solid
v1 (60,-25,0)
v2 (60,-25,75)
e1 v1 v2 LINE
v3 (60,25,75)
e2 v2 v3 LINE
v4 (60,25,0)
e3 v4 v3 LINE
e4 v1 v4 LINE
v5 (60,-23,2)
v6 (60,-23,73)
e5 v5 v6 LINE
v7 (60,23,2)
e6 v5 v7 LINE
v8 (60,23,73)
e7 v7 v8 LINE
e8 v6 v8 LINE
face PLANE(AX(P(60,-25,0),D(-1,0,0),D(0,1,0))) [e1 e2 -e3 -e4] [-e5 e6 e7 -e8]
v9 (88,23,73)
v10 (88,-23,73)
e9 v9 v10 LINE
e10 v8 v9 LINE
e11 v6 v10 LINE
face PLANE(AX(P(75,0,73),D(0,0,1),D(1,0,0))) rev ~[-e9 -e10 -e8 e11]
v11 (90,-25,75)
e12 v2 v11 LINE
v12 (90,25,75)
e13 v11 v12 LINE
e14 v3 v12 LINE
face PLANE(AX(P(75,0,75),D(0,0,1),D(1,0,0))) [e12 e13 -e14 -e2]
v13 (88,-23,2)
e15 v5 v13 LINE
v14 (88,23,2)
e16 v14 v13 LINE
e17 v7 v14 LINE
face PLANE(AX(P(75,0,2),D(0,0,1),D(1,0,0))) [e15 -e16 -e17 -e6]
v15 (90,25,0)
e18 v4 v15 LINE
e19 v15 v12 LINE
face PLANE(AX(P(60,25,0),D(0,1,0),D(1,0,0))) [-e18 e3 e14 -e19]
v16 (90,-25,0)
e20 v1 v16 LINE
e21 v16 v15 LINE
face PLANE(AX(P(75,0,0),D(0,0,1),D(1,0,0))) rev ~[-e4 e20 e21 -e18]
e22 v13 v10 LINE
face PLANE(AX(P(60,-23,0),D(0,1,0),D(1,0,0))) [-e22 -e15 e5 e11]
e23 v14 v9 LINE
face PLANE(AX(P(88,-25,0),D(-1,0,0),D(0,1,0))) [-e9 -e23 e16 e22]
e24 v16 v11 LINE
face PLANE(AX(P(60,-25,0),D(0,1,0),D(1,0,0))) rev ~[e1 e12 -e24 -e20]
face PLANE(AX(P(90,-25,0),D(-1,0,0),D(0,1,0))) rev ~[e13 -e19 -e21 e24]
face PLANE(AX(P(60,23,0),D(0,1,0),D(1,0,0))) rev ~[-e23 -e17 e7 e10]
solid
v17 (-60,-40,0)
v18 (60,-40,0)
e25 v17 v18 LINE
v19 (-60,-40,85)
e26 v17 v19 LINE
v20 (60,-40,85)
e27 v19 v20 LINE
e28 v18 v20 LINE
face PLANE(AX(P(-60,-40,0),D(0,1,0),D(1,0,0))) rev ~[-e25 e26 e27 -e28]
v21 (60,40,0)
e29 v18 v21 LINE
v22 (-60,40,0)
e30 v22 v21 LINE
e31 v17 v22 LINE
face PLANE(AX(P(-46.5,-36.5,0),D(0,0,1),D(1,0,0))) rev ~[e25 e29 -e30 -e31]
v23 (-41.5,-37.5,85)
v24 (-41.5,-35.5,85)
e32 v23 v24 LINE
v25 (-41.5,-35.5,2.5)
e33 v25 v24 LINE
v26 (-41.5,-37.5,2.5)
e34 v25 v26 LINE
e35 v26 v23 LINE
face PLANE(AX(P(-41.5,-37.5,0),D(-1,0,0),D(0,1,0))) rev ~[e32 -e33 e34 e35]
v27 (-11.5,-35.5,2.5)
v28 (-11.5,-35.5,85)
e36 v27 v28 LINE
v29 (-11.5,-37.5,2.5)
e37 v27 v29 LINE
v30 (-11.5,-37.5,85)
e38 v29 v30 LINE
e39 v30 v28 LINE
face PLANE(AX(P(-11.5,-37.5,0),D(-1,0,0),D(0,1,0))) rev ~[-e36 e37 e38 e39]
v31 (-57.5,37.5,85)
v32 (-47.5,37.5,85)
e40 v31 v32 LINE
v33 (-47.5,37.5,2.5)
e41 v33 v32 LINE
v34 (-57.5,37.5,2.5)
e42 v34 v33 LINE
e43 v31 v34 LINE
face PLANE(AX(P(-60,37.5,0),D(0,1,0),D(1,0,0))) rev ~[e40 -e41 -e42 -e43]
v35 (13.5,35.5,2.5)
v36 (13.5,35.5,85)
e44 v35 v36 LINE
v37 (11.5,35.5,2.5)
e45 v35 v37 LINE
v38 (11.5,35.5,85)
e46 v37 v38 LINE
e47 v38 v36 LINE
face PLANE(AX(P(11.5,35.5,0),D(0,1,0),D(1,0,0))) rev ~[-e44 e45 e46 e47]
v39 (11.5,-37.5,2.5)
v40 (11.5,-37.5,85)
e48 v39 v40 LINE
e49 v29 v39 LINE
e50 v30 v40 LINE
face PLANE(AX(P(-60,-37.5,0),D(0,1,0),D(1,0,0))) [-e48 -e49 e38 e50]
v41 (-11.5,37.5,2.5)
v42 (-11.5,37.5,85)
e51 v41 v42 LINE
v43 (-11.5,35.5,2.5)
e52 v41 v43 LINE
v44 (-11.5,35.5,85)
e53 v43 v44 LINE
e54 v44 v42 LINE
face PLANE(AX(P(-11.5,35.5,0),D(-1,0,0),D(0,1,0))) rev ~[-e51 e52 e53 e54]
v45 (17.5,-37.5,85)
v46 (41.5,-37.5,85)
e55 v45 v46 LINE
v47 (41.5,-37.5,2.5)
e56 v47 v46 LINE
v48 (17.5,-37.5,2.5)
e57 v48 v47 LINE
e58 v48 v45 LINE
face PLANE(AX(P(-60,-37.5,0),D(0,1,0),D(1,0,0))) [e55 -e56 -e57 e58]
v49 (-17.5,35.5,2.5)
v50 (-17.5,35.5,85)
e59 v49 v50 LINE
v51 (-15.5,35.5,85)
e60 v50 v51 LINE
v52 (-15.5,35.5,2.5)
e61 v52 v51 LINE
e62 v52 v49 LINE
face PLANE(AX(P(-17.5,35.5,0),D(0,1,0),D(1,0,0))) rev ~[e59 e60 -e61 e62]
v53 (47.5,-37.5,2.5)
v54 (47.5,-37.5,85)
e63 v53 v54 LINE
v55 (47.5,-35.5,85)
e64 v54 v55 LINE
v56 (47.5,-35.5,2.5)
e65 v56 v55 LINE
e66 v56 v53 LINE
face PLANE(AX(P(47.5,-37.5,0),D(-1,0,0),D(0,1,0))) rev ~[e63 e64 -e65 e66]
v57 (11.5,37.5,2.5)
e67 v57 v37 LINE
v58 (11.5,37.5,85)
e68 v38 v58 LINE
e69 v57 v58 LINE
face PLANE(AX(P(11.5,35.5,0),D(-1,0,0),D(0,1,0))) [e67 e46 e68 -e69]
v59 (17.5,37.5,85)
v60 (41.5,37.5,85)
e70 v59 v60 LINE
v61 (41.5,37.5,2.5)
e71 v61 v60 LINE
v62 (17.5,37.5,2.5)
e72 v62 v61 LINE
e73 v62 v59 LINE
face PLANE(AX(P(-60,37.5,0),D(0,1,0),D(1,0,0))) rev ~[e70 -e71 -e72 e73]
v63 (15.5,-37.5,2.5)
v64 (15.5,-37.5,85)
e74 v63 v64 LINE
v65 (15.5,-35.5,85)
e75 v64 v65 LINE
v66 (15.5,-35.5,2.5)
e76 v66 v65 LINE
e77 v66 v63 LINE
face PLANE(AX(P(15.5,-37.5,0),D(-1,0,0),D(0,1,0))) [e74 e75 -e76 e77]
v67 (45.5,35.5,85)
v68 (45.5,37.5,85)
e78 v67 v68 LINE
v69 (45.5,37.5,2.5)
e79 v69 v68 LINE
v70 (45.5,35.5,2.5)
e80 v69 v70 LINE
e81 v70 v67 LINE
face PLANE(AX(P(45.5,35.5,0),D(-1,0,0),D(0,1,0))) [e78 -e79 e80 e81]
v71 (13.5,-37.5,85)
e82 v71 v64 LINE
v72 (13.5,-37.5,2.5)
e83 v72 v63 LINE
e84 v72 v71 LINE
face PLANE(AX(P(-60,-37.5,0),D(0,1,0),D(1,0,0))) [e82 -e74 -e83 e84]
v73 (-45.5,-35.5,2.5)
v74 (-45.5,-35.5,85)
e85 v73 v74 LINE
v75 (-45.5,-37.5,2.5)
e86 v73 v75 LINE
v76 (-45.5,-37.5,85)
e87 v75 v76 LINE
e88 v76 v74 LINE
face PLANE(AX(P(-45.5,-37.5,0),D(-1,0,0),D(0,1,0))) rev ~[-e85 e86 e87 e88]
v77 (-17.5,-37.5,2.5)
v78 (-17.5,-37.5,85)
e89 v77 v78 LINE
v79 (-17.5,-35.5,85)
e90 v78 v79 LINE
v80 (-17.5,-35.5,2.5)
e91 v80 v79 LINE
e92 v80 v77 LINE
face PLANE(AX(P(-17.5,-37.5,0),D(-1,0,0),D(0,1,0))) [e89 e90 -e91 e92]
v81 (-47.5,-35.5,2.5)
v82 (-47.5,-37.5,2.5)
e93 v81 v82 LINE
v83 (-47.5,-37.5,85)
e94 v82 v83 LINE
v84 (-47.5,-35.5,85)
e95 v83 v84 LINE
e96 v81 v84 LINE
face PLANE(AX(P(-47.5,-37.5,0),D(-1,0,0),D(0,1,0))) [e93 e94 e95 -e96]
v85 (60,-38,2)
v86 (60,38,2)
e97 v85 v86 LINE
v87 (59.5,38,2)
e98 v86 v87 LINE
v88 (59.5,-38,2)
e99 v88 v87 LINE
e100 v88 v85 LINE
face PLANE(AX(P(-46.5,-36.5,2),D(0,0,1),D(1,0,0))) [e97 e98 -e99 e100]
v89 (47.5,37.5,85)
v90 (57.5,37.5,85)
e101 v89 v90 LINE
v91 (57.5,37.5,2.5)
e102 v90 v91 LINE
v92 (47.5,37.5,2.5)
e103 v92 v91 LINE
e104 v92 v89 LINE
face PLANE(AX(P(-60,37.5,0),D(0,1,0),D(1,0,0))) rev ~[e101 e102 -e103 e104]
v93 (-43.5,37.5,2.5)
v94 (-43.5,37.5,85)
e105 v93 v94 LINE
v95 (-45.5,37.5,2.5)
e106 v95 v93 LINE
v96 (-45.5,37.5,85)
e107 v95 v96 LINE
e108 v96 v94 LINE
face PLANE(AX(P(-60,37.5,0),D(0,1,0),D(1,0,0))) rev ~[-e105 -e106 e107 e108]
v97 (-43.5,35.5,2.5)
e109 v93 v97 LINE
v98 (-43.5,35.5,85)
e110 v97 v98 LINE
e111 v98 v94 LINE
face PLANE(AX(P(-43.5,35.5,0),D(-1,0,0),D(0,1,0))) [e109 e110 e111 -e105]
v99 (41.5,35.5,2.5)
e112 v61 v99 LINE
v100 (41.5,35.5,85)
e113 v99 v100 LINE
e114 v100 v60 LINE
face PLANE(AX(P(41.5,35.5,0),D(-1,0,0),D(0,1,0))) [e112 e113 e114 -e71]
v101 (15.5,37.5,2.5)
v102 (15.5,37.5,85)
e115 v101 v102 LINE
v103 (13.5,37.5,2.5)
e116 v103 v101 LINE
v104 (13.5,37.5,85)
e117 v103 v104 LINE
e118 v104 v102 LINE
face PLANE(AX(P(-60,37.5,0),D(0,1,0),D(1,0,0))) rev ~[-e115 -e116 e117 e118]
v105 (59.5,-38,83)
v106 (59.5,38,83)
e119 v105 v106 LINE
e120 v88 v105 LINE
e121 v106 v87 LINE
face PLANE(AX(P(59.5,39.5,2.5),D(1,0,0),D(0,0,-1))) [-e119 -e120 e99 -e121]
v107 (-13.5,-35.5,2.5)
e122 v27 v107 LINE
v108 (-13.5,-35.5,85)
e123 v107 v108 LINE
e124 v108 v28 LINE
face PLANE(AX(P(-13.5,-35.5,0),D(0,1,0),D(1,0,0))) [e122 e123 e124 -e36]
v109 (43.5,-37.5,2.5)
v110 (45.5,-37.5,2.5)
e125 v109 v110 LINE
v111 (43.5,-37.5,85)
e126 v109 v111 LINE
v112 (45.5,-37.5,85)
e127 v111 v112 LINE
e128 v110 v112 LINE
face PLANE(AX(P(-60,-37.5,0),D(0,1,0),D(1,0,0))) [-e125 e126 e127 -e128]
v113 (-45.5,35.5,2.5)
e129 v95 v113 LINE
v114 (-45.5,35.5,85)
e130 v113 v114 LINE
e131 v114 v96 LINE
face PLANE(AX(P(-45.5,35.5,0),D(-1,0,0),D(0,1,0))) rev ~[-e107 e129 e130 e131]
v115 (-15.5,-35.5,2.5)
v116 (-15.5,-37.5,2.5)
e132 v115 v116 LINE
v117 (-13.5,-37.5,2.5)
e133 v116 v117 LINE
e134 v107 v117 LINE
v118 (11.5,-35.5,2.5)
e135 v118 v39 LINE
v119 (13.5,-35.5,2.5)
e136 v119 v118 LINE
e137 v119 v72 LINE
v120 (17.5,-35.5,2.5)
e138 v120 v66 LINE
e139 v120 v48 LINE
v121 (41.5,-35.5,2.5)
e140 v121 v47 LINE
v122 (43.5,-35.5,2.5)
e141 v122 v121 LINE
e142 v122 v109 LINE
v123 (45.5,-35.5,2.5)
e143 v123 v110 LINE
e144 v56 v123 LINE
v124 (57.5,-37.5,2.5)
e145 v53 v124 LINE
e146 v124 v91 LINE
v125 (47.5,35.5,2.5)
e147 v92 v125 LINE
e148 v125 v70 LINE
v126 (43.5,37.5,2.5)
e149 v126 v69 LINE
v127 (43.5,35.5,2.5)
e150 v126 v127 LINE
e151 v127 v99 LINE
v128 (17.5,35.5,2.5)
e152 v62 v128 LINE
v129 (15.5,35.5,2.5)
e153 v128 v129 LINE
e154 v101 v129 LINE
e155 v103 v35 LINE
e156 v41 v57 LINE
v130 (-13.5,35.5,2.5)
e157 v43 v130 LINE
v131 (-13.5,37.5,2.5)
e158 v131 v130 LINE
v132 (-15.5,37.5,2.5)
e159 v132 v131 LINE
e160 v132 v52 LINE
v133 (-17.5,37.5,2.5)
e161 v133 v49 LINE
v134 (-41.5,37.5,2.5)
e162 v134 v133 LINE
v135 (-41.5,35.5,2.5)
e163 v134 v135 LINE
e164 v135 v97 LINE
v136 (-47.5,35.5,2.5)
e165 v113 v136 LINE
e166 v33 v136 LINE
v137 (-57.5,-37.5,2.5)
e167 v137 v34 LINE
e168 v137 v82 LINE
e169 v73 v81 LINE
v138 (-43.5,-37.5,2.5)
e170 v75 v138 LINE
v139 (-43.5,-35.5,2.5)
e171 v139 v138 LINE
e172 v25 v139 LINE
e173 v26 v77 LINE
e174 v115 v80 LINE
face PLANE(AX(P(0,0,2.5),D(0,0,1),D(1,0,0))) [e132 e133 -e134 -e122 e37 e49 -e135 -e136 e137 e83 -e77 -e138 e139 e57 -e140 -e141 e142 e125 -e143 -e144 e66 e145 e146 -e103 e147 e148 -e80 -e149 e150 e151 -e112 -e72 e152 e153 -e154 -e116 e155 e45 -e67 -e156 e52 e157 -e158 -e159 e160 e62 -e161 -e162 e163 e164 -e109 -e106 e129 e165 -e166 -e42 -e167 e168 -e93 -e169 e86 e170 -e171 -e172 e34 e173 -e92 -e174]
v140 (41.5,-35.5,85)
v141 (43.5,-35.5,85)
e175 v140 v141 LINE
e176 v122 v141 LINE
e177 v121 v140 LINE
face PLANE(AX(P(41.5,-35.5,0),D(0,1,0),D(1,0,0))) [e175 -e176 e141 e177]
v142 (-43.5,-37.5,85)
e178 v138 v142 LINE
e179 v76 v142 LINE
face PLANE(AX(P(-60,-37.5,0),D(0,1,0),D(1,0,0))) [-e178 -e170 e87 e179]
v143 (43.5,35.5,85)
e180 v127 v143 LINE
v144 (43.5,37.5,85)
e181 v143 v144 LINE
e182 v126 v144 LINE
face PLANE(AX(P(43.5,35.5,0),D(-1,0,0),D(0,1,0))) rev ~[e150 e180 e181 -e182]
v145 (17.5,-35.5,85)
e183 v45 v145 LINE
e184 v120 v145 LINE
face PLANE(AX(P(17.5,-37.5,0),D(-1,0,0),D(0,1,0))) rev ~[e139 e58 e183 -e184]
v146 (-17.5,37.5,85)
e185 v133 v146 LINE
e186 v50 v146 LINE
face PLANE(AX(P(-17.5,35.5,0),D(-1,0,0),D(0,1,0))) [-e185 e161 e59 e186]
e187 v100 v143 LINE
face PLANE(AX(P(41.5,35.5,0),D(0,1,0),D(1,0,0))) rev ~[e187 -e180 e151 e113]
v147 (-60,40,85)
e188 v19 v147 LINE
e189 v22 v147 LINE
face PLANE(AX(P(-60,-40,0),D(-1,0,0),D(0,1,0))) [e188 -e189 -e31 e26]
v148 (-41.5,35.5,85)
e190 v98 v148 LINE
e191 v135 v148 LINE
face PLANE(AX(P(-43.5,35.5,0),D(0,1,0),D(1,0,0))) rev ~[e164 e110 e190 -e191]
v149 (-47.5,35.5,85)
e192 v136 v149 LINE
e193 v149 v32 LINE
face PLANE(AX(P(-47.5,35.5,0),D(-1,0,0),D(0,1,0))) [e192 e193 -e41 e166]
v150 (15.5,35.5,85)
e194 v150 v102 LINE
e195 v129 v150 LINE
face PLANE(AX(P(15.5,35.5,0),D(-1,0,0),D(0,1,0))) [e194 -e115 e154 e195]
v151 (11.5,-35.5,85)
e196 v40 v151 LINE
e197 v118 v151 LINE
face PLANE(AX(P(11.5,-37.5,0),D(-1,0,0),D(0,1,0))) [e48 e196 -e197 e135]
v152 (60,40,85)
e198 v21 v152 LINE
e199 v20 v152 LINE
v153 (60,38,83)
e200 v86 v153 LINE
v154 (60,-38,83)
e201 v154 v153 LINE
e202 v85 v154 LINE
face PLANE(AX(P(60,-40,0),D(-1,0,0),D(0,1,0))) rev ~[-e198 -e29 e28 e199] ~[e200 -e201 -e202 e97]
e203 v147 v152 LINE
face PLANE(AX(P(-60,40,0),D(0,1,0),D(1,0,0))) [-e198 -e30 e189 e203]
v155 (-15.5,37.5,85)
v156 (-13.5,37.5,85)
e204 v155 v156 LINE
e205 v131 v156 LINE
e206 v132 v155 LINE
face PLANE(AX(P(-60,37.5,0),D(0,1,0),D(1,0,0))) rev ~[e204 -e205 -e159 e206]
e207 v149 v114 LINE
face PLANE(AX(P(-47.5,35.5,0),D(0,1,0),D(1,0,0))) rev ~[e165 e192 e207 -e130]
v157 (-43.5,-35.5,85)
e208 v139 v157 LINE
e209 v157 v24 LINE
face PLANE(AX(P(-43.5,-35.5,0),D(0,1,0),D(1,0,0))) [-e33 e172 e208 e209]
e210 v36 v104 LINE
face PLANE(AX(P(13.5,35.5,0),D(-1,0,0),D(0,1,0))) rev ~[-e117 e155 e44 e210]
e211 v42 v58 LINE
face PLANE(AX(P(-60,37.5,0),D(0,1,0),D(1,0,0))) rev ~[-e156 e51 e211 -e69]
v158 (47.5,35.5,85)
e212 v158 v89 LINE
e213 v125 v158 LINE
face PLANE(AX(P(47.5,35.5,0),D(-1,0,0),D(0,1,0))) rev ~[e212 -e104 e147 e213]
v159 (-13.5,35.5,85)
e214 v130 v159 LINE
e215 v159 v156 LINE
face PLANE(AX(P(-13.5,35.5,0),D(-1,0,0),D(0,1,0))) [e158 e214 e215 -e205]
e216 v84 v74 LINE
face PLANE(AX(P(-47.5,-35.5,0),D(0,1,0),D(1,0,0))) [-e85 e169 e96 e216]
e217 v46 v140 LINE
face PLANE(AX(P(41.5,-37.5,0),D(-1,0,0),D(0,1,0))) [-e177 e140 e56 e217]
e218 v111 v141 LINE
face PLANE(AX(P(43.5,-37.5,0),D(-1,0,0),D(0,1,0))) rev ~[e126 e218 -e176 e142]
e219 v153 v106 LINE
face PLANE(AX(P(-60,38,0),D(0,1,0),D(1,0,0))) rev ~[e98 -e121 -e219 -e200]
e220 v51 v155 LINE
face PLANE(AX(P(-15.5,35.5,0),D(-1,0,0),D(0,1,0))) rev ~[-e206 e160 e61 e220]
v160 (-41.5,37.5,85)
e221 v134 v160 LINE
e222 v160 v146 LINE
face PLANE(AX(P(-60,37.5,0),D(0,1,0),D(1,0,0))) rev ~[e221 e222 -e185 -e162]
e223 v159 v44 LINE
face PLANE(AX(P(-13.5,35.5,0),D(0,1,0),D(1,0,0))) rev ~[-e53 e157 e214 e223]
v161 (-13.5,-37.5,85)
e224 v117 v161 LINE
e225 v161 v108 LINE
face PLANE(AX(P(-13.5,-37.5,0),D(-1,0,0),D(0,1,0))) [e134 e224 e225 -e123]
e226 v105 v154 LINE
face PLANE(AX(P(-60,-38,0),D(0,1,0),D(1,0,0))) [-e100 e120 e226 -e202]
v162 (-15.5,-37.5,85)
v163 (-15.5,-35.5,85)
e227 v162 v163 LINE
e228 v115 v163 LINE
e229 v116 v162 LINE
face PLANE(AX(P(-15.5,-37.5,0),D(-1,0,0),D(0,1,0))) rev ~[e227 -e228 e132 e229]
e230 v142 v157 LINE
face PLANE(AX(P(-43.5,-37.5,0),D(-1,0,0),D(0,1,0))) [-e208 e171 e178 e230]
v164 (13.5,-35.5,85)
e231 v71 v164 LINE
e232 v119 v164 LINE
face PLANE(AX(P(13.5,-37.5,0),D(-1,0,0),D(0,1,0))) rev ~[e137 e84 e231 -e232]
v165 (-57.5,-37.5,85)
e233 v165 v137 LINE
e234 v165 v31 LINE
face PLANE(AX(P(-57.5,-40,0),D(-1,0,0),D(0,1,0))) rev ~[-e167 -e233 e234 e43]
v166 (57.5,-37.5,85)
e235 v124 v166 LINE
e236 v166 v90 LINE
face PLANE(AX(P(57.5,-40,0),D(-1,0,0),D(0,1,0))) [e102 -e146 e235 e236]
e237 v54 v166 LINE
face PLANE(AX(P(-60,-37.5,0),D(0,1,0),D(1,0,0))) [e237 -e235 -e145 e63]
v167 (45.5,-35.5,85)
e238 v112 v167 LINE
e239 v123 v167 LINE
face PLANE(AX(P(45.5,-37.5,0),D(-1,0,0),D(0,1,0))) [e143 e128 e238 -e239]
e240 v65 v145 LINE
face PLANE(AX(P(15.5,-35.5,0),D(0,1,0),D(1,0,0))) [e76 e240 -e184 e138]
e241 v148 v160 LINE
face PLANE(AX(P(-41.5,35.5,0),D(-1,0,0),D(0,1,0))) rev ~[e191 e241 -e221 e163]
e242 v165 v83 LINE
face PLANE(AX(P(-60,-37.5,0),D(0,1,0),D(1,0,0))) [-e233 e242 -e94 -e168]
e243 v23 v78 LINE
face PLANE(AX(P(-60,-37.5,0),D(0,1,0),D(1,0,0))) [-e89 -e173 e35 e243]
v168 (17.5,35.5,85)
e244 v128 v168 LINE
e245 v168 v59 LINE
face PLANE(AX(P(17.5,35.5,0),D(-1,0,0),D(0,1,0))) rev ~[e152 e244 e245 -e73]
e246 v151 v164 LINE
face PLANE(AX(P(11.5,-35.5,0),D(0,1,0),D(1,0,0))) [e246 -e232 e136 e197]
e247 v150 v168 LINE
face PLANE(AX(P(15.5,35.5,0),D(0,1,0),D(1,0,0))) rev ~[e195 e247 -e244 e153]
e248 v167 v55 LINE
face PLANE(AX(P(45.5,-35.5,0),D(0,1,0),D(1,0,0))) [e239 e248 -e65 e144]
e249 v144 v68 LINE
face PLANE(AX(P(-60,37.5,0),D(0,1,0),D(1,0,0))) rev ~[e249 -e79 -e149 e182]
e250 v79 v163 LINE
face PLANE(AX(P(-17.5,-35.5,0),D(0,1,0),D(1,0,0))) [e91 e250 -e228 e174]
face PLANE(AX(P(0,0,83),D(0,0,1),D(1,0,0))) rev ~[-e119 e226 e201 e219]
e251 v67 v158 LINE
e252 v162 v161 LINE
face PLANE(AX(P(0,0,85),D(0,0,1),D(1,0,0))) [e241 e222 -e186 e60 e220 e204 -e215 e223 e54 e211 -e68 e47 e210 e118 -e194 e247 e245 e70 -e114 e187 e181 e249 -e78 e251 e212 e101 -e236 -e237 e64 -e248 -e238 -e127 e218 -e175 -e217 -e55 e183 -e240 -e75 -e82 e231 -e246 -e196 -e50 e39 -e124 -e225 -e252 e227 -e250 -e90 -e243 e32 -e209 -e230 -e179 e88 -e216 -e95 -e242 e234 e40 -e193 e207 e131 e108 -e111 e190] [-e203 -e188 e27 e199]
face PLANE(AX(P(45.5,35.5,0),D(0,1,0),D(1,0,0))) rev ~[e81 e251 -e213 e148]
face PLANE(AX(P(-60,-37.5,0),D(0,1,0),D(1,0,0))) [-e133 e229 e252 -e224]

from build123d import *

# Parameters (mm, degrees)
F0_W           = 120
F0_H           = 80
F1_DEPTH       = 85
F2_T           = -2.5
F3_W           = 2
F3_H           = 2
F4_DEPTH       = 85
F5_W           = 30
F5_H           = 50
F6_DEPTH       = 75
F7_T           = -2
F7_2_T         = 2
F7_2_T3_DEPTH  = 86.5
F7_2_T5_DEPTH  = 14
F7_2_T7_DEPTH  = 6
F7_2_T9_DEPTH  = 28
F7_2_T11_DEPTH = 6
F7_2_T13_DEPTH = 27
F7_2_T15_DEPTH = 6
F7_2_T17_DEPTH = 28
F7_2_T19_DEPTH = 6
F7_2_T21_DEPTH = 14
F7_2_T23_DEPTH = 79
F7_2_T25_DEPTH = 6
F7_2_T27_DEPTH = 6
F7_2_T29_DEPTH = 6
F7_2_T31_DEPTH = 6
F7_2_T33_DEPTH = 6
F7_2_T35_DEPTH = 6
F7_2_T37_DEPTH = 6
F7_2_T39_DEPTH = 6
F7_2_T41_DEPTH = 6
F7_2_T43_DEPTH = 6


# Not quite as in the source:
# - a shell that OpenCascade refuses in one call is made with other operations: the cavity is built on its own and cut out


with BuildPart() as f1:
    # F0 (on Top) → F1 (new body)
    with BuildSketch(Plane.XY):
        Rectangle(F0_W, F0_H)
    extrude(amount=F1_DEPTH)

    # F2
    f2_openings = [f1.faces().sort_by_distance(p)[0] for p in [
        (0, 0, 85),
    ]]
    offset(amount=F2_T, openings=f2_openings)

    # F3 (on Top) → F4 (join)
    with BuildSketch(Plane.XY):
        with Locations((-46.5, -36.5)):
            Rectangle(F3_W, F3_H)
        with Locations((-42.5, -36.5)):
            Rectangle(F3_W, F3_H)
        with Locations((-16.5, -36.5)):
            Rectangle(F3_W, F3_H)
        with Locations((-12.5, -36.5)):
            Rectangle(F3_W, F3_H)
        with Locations((42.5, -36.5)):
            Rectangle(F3_W, F3_H)
        with Locations((46.5, -36.5)):
            Rectangle(F3_W, F3_H)
        with Locations((12.5, -36.5)):
            Rectangle(F3_W, F3_H)
        with Locations((16.5, -36.5)):
            Rectangle(F3_W, F3_H)
        with Locations((-46.5, 36.5)):
            Rectangle(F3_W, F3_H)
        with Locations((42.5, 36.5)):
            Rectangle(F3_W, F3_H)
        with Locations((-16.5, 36.5)):
            Rectangle(F3_W, F3_H)
        with Locations((-42.5, 36.5)):
            Rectangle(F3_W, F3_H)
        with Locations((-12.5, 36.5)):
            Rectangle(F3_W, F3_H)
        with Locations((46.5, 36.5)):
            Rectangle(F3_W, F3_H)
        with Locations((16.5, 36.5)):
            Rectangle(F3_W, F3_H)
        with Locations((12.5, 36.5)):
            Rectangle(F3_W, F3_H)
    extrude(amount=F4_DEPTH)

    # F7#2: shell of thickness 2, made by hand


with BuildPart() as f6:
    # F5 (on Top) → F6 (new body)
    with BuildSketch(Plane.XY):
        with Locations((75, 0)):
            Rectangle(F5_W, F5_H)
    extrude(amount=F6_DEPTH)

    # F7
    f7_openings = [f6.faces().sort_by_distance(p)[0] for p in [
        (60, 0, 37.5),
    ]]
    offset(amount=F7_T, openings=f7_openings)


with BuildPart() as f7_2_core1:
    # F7_2_t2: copy of F1
    add(f1.part)

    # the walls: a layer under each face that stays
    f7_2_faces = [f7_2_core1.faces().sort_by_distance(p)[0] for p in [
        (0, -40, 42.5),
        (-60, 0, 42.5),
        (0, 0, 0),
        (-16, -37.3333333333, 85),
        (0, 40, 42.5),
        (-52.5, -37.5, 43.75),
        (-44.5, -37.5, 43.75),
        (-29.5, -37.5, 43.75),
        (-14.5, -37.5, 43.75),
        (0, -37.5, 43.75),
        (14.5, -37.5, 43.75),
        (29.5, -37.5, 43.75),
        (44.5, -37.5, 43.75),
        (52.5, -37.5, 43.75),
        (-57.5, 0, 43.75),
        (52.5, 37.5, 43.75),
        (44.5, 37.5, 43.75),
        (29.5, 37.5, 43.75),
        (14.5, 37.5, 43.75),
        (0, 37.5, 43.75),
        (-14.5, 37.5, 43.75),
        (-29.5, 37.5, 43.75),
        (-44.5, 37.5, 43.75),
        (-52.5, 37.5, 43.75),
        (57.5, 0, 43.75),
        (0, 0, 2.5),
        (-47.5, -36.5, 43.75),
        (-45.5, -36.5, 43.75),
        (-46.5, -35.5, 43.75),
        (-43.5, -36.5, 43.75),
        (-41.5, -36.5, 43.75),
        (-42.5, -35.5, 43.75),
        (-17.5, -36.5, 43.75),
        (-15.5, -36.5, 43.75),
        (-16.5, -35.5, 43.75),
        (-13.5, -36.5, 43.75),
        (-11.5, -36.5, 43.75),
        (-12.5, -35.5, 43.75),
        (11.5, -36.5, 43.75),
        (12.5, -35.5, 43.75),
        (13.5, -36.5, 43.75),
        (15.5, -36.5, 43.75),
        (17.5, -36.5, 43.75),
        (16.5, -35.5, 43.75),
        (41.5, -36.5, 43.75),
        (43.5, -36.5, 43.75),
        (42.5, -35.5, 43.75),
        (45.5, -36.5, 43.75),
        (47.5, -36.5, 43.75),
        (46.5, -35.5, 43.75),
        (47.5, 36.5, 43.75),
        (46.5, 35.5, 43.75),
        (45.5, 36.5, 43.75),
        (43.5, 36.5, 43.75),
        (42.5, 35.5, 43.75),
        (41.5, 36.5, 43.75),
        (17.5, 36.5, 43.75),
        (15.5, 36.5, 43.75),
        (16.5, 35.5, 43.75),
        (13.5, 36.5, 43.75),
        (11.5, 36.5, 43.75),
        (12.5, 35.5, 43.75),
        (-11.5, 36.5, 43.75),
        (-13.5, 36.5, 43.75),
        (-12.5, 35.5, 43.75),
        (-15.5, 36.5, 43.75),
        (-17.5, 36.5, 43.75),
        (-16.5, 35.5, 43.75),
        (-41.5, 36.5, 43.75),
        (-43.5, 36.5, 43.75),
        (-42.5, 35.5, 43.75),
        (-45.5, 36.5, 43.75),
        (-46.5, 35.5, 43.75),
        (-47.5, 36.5, 43.75),
    ]]
    thicken(f7_2_faces, amount=-F7_2_T, mode=Mode.SUBTRACT)

    # F7_2_s4 → F7_2_t3 (cut)
    with BuildSketch(Plane.XY.offset(0.5)):
        Polygon((-57.48, -37.48), (-57.5, -39.5), (-59.5, -39.5), (-59.5, -37.5), align=None)
        Polygon((-47.52, -37.48), (-47.5, -39.5), (-45.5, -39.5), (-45.5, -37.5), align=None)
        Polygon((-45.48, -37.48), (-45.5, -39.5), (-47.5, -39.5), (-47.5, -37.5), align=None)
        Polygon((-43.52, -37.48), (-43.5, -39.5), (-41.5, -39.5), (-41.5, -37.5), align=None)
        Polygon((-41.48, -37.48), (-41.5, -39.5), (-43.5, -39.5), (-43.5, -37.5), align=None)
        Polygon((-17.52, -37.48), (-17.5, -39.5), (-15.5, -39.5), (-15.5, -37.5), align=None)
        Polygon((-15.48, -37.48), (-15.5, -39.5), (-17.5, -39.5), (-17.5, -37.5), align=None)
        Polygon((-13.52, -37.48), (-13.5, -39.5), (-11.5, -39.5), (-11.5, -37.5), align=None)
        Polygon((-11.48, -37.48), (-11.5, -39.5), (-13.5, -39.5), (-13.5, -37.5), align=None)
        Polygon((11.48, -37.48), (11.5, -39.5), (13.5, -39.5), (13.5, -37.5), align=None)
        Polygon((13.52, -37.48), (13.5, -39.5), (11.5, -39.5), (11.5, -37.5), align=None)
        Polygon((15.48, -37.48), (15.5, -39.5), (17.5, -39.5), (17.5, -37.5), align=None)
        Polygon((17.52, -37.48), (17.5, -39.5), (15.5, -39.5), (15.5, -37.5), align=None)
        Polygon((41.48, -37.48), (41.5, -39.5), (43.5, -39.5), (43.5, -37.5), align=None)
        Polygon((43.52, -37.48), (43.5, -39.5), (41.5, -39.5), (41.5, -37.5), align=None)
        Polygon((45.48, -37.48), (45.5, -39.5), (47.5, -39.5), (47.5, -37.5), align=None)
        Polygon((47.52, -37.48), (47.5, -39.5), (45.5, -39.5), (45.5, -37.5), align=None)
        Polygon((57.48, -37.48), (57.5, -39.5), (59.5, -39.5), (59.5, -37.5), align=None)
        Polygon((-57.48, 37.48), (-59.5, 37.5), (-59.5, 39.5), (-57.5, 39.5), align=None)
        Polygon((57.48, 37.48), (57.5, 39.5), (59.5, 39.5), (59.5, 37.5), align=None)
        Polygon((47.52, 37.48), (47.5, 39.5), (45.5, 39.5), (45.5, 37.5), align=None)
        Polygon((45.48, 37.48), (45.5, 39.5), (47.5, 39.5), (47.5, 37.5), align=None)
        Polygon((43.52, 37.48), (43.5, 39.5), (41.5, 39.5), (41.5, 37.5), align=None)
        Polygon((41.48, 37.48), (41.5, 39.5), (43.5, 39.5), (43.5, 37.5), align=None)
        Polygon((17.52, 37.48), (17.5, 39.5), (15.5, 39.5), (15.5, 37.5), align=None)
        Polygon((15.48, 37.48), (15.5, 39.5), (17.5, 39.5), (17.5, 37.5), align=None)
        Polygon((13.52, 37.48), (13.5, 39.5), (11.5, 39.5), (11.5, 37.5), align=None)
        Polygon((11.48, 37.48), (11.5, 39.5), (13.5, 39.5), (13.5, 37.5), align=None)
        Polygon((-11.48, 37.48), (-11.5, 39.5), (-13.5, 39.5), (-13.5, 37.5), align=None)
        Polygon((-13.52, 37.48), (-13.5, 39.5), (-11.5, 39.5), (-11.5, 37.5), align=None)
        Polygon((-15.48, 37.48), (-15.5, 39.5), (-17.5, 39.5), (-17.5, 37.5), align=None)
        Polygon((-17.52, 37.48), (-17.5, 39.5), (-15.5, 39.5), (-15.5, 37.5), align=None)
        Polygon((-41.48, 37.48), (-41.5, 39.5), (-43.5, 39.5), (-43.5, 37.5), align=None)
        Polygon((-43.52, 37.48), (-43.5, 39.5), (-41.5, 39.5), (-41.5, 37.5), align=None)
        Polygon((-45.48, 37.48), (-45.5, 39.5), (-47.5, 39.5), (-47.5, 37.5), align=None)
        Polygon((-47.52, 37.48), (-47.5, 39.5), (-45.5, 39.5), (-45.5, 37.5), align=None)
    extrude(amount=F7_2_T3_DEPTH, mode=Mode.SUBTRACT)

    # F7_2_s6 → F7_2_t5 (cut)
    with BuildSketch(Plane.YZ.offset(-59.5)):
        Polygon((-37.48, 2.52), (-39.5, 2.5), (-39.5, 0.5), (-37.5, 0.5), align=None)
        Polygon((37.48, 2.52), (39.5, 2.5), (39.5, 0.5), (37.5, 0.5), align=None)
    extrude(amount=F7_2_T5_DEPTH, mode=Mode.SUBTRACT)

    # F7_2_s8 → F7_2_t7 (cut)
    with BuildSketch(Plane.YZ.offset(-47.5)):
        Polygon((-37.48, 2.52), (-39.5, 2.5), (-39.5, 0.5), (-37.5, 0.5), align=None)
        Polygon((37.48, 2.52), (39.5, 2.5), (39.5, 0.5), (37.5, 0.5), align=None)
    extrude(amount=F7_2_T7_DEPTH, mode=Mode.SUBTRACT)

    # F7_2_s10 → F7_2_t9 (cut)
    with BuildSketch(Plane.YZ.offset(-43.5)):
        Polygon((-37.48, 2.52), (-39.5, 2.5), (-39.5, 0.5), (-37.5, 0.5), align=None)
        Polygon((37.48, 2.52), (39.5, 2.5), (39.5, 0.5), (37.5, 0.5), align=None)
    extrude(amount=F7_2_T9_DEPTH, mode=Mode.SUBTRACT)

    # F7_2_s12 → F7_2_t11 (cut)
    with BuildSketch(Plane.YZ.offset(-17.5)):
        Polygon((-37.48, 2.52), (-39.5, 2.5), (-39.5, 0.5), (-37.5, 0.5), align=None)
        Polygon((37.48, 2.52), (39.5, 2.5), (39.5, 0.5), (37.5, 0.5), align=None)
    extrude(amount=F7_2_T11_DEPTH, mode=Mode.SUBTRACT)

    # F7_2_s14 → F7_2_t13 (cut)
    with BuildSketch(Plane.YZ.offset(-13.5)):
        Polygon((-37.48, 2.52), (-39.5, 2.5), (-39.5, 0.5), (-37.5, 0.5), align=None)
        Polygon((37.48, 2.52), (39.5, 2.5), (39.5, 0.5), (37.5, 0.5), align=None)
    extrude(amount=F7_2_T13_DEPTH, mode=Mode.SUBTRACT)

    # F7_2_s16 → F7_2_t15 (cut)
    with BuildSketch(Plane.YZ.offset(11.5)):
        Polygon((-37.48, 2.52), (-39.5, 2.5), (-39.5, 0.5), (-37.5, 0.5), align=None)
        Polygon((37.48, 2.52), (39.5, 2.5), (39.5, 0.5), (37.5, 0.5), align=None)
    extrude(amount=F7_2_T15_DEPTH, mode=Mode.SUBTRACT)

    # F7_2_s18 → F7_2_t17 (cut)
    with BuildSketch(Plane.YZ.offset(15.5)):
        Polygon((-37.48, 2.52), (-39.5, 2.5), (-39.5, 0.5), (-37.5, 0.5), align=None)
        Polygon((37.48, 2.52), (39.5, 2.5), (39.5, 0.5), (37.5, 0.5), align=None)
    extrude(amount=F7_2_T17_DEPTH, mode=Mode.SUBTRACT)

    # F7_2_s20 → F7_2_t19 (cut)
    with BuildSketch(Plane.YZ.offset(41.5)):
        Polygon((-37.48, 2.52), (-39.5, 2.5), (-39.5, 0.5), (-37.5, 0.5), align=None)
        Polygon((37.48, 2.52), (39.5, 2.5), (39.5, 0.5), (37.5, 0.5), align=None)
    extrude(amount=F7_2_T19_DEPTH, mode=Mode.SUBTRACT)

    # F7_2_s22 → F7_2_t21 (cut)
    with BuildSketch(Plane.YZ.offset(45.5)):
        Polygon((-37.48, 2.52), (-39.5, 2.5), (-39.5, 0.5), (-37.5, 0.5), align=None)
        Polygon((37.48, 2.52), (39.5, 2.5), (39.5, 0.5), (37.5, 0.5), align=None)
    extrude(amount=F7_2_T21_DEPTH, mode=Mode.SUBTRACT)

    # F7_2_s24 → F7_2_t23 (cut)
    with BuildSketch(Plane.XZ.offset(-39.5)):
        Polygon((-57.48, 2.52), (-59.5, 2.5), (-59.5, 0.5), (-57.5, 0.5), align=None)
        Polygon((57.48, 2.52), (59.5, 2.5), (59.5, 0.5), (57.5, 0.5), align=None)
    extrude(amount=F7_2_T23_DEPTH, mode=Mode.SUBTRACT)

    # F7_2_s26 → F7_2_t25 (cut)
    with BuildSketch(Plane.XZ.offset(-39.5)):
        Polygon((-47.52, 2.52), (-47.5, 0.5), (-45.5, 0.5), (-45.5, 2.5), align=None)
        Polygon((-45.48, 2.52), (-45.5, 0.5), (-47.5, 0.5), (-47.5, 2.5), align=None)
        Polygon((-43.52, 2.52), (-43.5, 0.5), (-41.5, 0.5), (-41.5, 2.5), align=None)
        Polygon((-41.48, 2.52), (-41.5, 0.5), (-43.5, 0.5), (-43.5, 2.5), align=None)
        Polygon((-17.52, 2.52), (-17.5, 0.5), (-15.5, 0.5), (-15.5, 2.5), align=None)
        Polygon((-15.48, 2.52), (-15.5, 0.5), (-17.5, 0.5), (-17.5, 2.5), align=None)
        Polygon((-13.52, 2.52), (-13.5, 0.5), (-11.5, 0.5), (-11.5, 2.5), align=None)
        Polygon((-11.48, 2.52), (-11.5, 0.5), (-13.5, 0.5), (-13.5, 2.5), align=None)
        Polygon((11.48, 2.52), (11.5, 0.5), (13.5, 0.5), (13.5, 2.5), align=None)
        Polygon((13.52, 2.52), (13.5, 0.5), (11.5, 0.5), (11.5, 2.5), align=None)
        Polygon((15.48, 2.52), (15.5, 0.5), (17.5, 0.5), (17.5, 2.5), align=None)
        Polygon((17.52, 2.52), (17.5, 0.5), (15.5, 0.5), (15.5, 2.5), align=None)
        Polygon((41.48, 2.52), (41.5, 0.5), (43.5, 0.5), (43.5, 2.5), align=None)
        Polygon((43.52, 2.52), (43.5, 0.5), (41.5, 0.5), (41.5, 2.5), align=None)
        Polygon((45.48, 2.52), (45.5, 0.5), (47.5, 0.5), (47.5, 2.5), align=None)
        Polygon((47.52, 2.52), (47.5, 0.5), (45.5, 0.5), (45.5, 2.5), align=None)
    extrude(amount=F7_2_T25_DEPTH, mode=Mode.SUBTRACT)

    # F7_2_s28 → F7_2_t27 (cut)
    with BuildSketch(Plane.YZ.offset(-49.5)):
        Polygon((35.48, 2.52), (35.5, 0.5), (37.5, 0.5), (37.5, 2.5), align=None)
        Polygon((-35.48, 2.52), (-35.5, 0.5), (-37.5, 0.5), (-37.5, 2.5), align=None)
    extrude(amount=F7_2_T27_DEPTH, mode=Mode.SUBTRACT)

    # F7_2_s30 → F7_2_t29 (cut)
    with BuildSketch(Plane.YZ.offset(-45.5)):
        Polygon((35.48, 2.52), (35.5, 0.5), (37.5, 0.5), (37.5, 2.5), align=None)
        Polygon((-35.48, 2.52), (-35.5, 0.5), (-37.5, 0.5), (-37.5, 2.5), align=None)
    extrude(amount=F7_2_T29_DEPTH, mode=Mode.SUBTRACT)

    # F7_2_s32 → F7_2_t31 (cut)
    with BuildSketch(Plane.YZ.offset(-19.5)):
        Polygon((35.48, 2.52), (35.5, 0.5), (37.5, 0.5), (37.5, 2.5), align=None)
        Polygon((-35.48, 2.52), (-35.5, 0.5), (-37.5, 0.5), (-37.5, 2.5), align=None)
    extrude(amount=F7_2_T31_DEPTH, mode=Mode.SUBTRACT)

    # F7_2_s34 → F7_2_t33 (cut)
    with BuildSketch(Plane.YZ.offset(-15.5)):
        Polygon((35.48, 2.52), (35.5, 0.5), (37.5, 0.5), (37.5, 2.5), align=None)
        Polygon((-35.48, 2.52), (-35.5, 0.5), (-37.5, 0.5), (-37.5, 2.5), align=None)
    extrude(amount=F7_2_T33_DEPTH, mode=Mode.SUBTRACT)

    # F7_2_s36 → F7_2_t35 (cut)
    with BuildSketch(Plane.YZ.offset(9.5)):
        Polygon((35.48, 2.52), (35.5, 0.5), (37.5, 0.5), (37.5, 2.5), align=None)
        Polygon((-35.48, 2.52), (-35.5, 0.5), (-37.5, 0.5), (-37.5, 2.5), align=None)
    extrude(amount=F7_2_T35_DEPTH, mode=Mode.SUBTRACT)

    # F7_2_s38 → F7_2_t37 (cut)
    with BuildSketch(Plane.YZ.offset(13.5)):
        Polygon((35.48, 2.52), (35.5, 0.5), (37.5, 0.5), (37.5, 2.5), align=None)
        Polygon((-35.48, 2.52), (-35.5, 0.5), (-37.5, 0.5), (-37.5, 2.5), align=None)
    extrude(amount=F7_2_T37_DEPTH, mode=Mode.SUBTRACT)

    # F7_2_s40 → F7_2_t39 (cut)
    with BuildSketch(Plane.YZ.offset(39.5)):
        Polygon((35.48, 2.52), (35.5, 0.5), (37.5, 0.5), (37.5, 2.5), align=None)
        Polygon((-35.48, 2.52), (-35.5, 0.5), (-37.5, 0.5), (-37.5, 2.5), align=None)
    extrude(amount=F7_2_T39_DEPTH, mode=Mode.SUBTRACT)

    # F7_2_s42 → F7_2_t41 (cut)
    with BuildSketch(Plane.YZ.offset(43.5)):
        Polygon((35.48, 2.52), (35.5, 0.5), (37.5, 0.5), (37.5, 2.5), align=None)
        Polygon((-35.48, 2.52), (-35.5, 0.5), (-37.5, 0.5), (-37.5, 2.5), align=None)
    extrude(amount=F7_2_T41_DEPTH, mode=Mode.SUBTRACT)

    # F7_2_s44 → F7_2_t43 (cut)
    with BuildSketch(Plane.XZ.offset(33.5)):
        Polygon((47.52, 2.52), (47.5, 0.5), (45.5, 0.5), (45.5, 2.5), align=None)
        Polygon((45.48, 2.52), (45.5, 0.5), (47.5, 0.5), (47.5, 2.5), align=None)
        Polygon((43.52, 2.52), (43.5, 0.5), (41.5, 0.5), (41.5, 2.5), align=None)
        Polygon((41.48, 2.52), (41.5, 0.5), (43.5, 0.5), (43.5, 2.5), align=None)
        Polygon((17.52, 2.52), (17.5, 0.5), (15.5, 0.5), (15.5, 2.5), align=None)
        Polygon((15.48, 2.52), (15.5, 0.5), (17.5, 0.5), (17.5, 2.5), align=None)
        Polygon((13.52, 2.52), (13.5, 0.5), (11.5, 0.5), (11.5, 2.5), align=None)
        Polygon((11.48, 2.52), (11.5, 0.5), (13.5, 0.5), (13.5, 2.5), align=None)
        Polygon((-11.48, 2.52), (-11.5, 0.5), (-13.5, 0.5), (-13.5, 2.5), align=None)
        Polygon((-13.52, 2.52), (-13.5, 0.5), (-11.5, 0.5), (-11.5, 2.5), align=None)
        Polygon((-15.48, 2.52), (-15.5, 0.5), (-17.5, 0.5), (-17.5, 2.5), align=None)
        Polygon((-17.52, 2.52), (-17.5, 0.5), (-15.5, 0.5), (-15.5, 2.5), align=None)
        Polygon((-41.48, 2.52), (-41.5, 0.5), (-43.5, 0.5), (-43.5, 2.5), align=None)
        Polygon((-43.52, 2.52), (-43.5, 0.5), (-41.5, 0.5), (-41.5, 2.5), align=None)
        Polygon((-45.48, 2.52), (-45.5, 0.5), (-47.5, 0.5), (-47.5, 2.5), align=None)
        Polygon((-47.52, 2.52), (-47.5, 0.5), (-45.5, 0.5), (-45.5, 2.5), align=None)
    extrude(amount=F7_2_T43_DEPTH, mode=Mode.SUBTRACT)


with BuildPart() as f1_1:
    add(f1.part)

    # what is left inside the walls is the cavity
    f7_2_cavity = [f7_2_core1.part.solids().sort_by_distance(p)[0] for p in [
        (59.98, 0, 56),
    ]]
    add(f7_2_cavity, mode=Mode.SUBTRACT)


solid = Compound([f6.part, f1_1.part])
